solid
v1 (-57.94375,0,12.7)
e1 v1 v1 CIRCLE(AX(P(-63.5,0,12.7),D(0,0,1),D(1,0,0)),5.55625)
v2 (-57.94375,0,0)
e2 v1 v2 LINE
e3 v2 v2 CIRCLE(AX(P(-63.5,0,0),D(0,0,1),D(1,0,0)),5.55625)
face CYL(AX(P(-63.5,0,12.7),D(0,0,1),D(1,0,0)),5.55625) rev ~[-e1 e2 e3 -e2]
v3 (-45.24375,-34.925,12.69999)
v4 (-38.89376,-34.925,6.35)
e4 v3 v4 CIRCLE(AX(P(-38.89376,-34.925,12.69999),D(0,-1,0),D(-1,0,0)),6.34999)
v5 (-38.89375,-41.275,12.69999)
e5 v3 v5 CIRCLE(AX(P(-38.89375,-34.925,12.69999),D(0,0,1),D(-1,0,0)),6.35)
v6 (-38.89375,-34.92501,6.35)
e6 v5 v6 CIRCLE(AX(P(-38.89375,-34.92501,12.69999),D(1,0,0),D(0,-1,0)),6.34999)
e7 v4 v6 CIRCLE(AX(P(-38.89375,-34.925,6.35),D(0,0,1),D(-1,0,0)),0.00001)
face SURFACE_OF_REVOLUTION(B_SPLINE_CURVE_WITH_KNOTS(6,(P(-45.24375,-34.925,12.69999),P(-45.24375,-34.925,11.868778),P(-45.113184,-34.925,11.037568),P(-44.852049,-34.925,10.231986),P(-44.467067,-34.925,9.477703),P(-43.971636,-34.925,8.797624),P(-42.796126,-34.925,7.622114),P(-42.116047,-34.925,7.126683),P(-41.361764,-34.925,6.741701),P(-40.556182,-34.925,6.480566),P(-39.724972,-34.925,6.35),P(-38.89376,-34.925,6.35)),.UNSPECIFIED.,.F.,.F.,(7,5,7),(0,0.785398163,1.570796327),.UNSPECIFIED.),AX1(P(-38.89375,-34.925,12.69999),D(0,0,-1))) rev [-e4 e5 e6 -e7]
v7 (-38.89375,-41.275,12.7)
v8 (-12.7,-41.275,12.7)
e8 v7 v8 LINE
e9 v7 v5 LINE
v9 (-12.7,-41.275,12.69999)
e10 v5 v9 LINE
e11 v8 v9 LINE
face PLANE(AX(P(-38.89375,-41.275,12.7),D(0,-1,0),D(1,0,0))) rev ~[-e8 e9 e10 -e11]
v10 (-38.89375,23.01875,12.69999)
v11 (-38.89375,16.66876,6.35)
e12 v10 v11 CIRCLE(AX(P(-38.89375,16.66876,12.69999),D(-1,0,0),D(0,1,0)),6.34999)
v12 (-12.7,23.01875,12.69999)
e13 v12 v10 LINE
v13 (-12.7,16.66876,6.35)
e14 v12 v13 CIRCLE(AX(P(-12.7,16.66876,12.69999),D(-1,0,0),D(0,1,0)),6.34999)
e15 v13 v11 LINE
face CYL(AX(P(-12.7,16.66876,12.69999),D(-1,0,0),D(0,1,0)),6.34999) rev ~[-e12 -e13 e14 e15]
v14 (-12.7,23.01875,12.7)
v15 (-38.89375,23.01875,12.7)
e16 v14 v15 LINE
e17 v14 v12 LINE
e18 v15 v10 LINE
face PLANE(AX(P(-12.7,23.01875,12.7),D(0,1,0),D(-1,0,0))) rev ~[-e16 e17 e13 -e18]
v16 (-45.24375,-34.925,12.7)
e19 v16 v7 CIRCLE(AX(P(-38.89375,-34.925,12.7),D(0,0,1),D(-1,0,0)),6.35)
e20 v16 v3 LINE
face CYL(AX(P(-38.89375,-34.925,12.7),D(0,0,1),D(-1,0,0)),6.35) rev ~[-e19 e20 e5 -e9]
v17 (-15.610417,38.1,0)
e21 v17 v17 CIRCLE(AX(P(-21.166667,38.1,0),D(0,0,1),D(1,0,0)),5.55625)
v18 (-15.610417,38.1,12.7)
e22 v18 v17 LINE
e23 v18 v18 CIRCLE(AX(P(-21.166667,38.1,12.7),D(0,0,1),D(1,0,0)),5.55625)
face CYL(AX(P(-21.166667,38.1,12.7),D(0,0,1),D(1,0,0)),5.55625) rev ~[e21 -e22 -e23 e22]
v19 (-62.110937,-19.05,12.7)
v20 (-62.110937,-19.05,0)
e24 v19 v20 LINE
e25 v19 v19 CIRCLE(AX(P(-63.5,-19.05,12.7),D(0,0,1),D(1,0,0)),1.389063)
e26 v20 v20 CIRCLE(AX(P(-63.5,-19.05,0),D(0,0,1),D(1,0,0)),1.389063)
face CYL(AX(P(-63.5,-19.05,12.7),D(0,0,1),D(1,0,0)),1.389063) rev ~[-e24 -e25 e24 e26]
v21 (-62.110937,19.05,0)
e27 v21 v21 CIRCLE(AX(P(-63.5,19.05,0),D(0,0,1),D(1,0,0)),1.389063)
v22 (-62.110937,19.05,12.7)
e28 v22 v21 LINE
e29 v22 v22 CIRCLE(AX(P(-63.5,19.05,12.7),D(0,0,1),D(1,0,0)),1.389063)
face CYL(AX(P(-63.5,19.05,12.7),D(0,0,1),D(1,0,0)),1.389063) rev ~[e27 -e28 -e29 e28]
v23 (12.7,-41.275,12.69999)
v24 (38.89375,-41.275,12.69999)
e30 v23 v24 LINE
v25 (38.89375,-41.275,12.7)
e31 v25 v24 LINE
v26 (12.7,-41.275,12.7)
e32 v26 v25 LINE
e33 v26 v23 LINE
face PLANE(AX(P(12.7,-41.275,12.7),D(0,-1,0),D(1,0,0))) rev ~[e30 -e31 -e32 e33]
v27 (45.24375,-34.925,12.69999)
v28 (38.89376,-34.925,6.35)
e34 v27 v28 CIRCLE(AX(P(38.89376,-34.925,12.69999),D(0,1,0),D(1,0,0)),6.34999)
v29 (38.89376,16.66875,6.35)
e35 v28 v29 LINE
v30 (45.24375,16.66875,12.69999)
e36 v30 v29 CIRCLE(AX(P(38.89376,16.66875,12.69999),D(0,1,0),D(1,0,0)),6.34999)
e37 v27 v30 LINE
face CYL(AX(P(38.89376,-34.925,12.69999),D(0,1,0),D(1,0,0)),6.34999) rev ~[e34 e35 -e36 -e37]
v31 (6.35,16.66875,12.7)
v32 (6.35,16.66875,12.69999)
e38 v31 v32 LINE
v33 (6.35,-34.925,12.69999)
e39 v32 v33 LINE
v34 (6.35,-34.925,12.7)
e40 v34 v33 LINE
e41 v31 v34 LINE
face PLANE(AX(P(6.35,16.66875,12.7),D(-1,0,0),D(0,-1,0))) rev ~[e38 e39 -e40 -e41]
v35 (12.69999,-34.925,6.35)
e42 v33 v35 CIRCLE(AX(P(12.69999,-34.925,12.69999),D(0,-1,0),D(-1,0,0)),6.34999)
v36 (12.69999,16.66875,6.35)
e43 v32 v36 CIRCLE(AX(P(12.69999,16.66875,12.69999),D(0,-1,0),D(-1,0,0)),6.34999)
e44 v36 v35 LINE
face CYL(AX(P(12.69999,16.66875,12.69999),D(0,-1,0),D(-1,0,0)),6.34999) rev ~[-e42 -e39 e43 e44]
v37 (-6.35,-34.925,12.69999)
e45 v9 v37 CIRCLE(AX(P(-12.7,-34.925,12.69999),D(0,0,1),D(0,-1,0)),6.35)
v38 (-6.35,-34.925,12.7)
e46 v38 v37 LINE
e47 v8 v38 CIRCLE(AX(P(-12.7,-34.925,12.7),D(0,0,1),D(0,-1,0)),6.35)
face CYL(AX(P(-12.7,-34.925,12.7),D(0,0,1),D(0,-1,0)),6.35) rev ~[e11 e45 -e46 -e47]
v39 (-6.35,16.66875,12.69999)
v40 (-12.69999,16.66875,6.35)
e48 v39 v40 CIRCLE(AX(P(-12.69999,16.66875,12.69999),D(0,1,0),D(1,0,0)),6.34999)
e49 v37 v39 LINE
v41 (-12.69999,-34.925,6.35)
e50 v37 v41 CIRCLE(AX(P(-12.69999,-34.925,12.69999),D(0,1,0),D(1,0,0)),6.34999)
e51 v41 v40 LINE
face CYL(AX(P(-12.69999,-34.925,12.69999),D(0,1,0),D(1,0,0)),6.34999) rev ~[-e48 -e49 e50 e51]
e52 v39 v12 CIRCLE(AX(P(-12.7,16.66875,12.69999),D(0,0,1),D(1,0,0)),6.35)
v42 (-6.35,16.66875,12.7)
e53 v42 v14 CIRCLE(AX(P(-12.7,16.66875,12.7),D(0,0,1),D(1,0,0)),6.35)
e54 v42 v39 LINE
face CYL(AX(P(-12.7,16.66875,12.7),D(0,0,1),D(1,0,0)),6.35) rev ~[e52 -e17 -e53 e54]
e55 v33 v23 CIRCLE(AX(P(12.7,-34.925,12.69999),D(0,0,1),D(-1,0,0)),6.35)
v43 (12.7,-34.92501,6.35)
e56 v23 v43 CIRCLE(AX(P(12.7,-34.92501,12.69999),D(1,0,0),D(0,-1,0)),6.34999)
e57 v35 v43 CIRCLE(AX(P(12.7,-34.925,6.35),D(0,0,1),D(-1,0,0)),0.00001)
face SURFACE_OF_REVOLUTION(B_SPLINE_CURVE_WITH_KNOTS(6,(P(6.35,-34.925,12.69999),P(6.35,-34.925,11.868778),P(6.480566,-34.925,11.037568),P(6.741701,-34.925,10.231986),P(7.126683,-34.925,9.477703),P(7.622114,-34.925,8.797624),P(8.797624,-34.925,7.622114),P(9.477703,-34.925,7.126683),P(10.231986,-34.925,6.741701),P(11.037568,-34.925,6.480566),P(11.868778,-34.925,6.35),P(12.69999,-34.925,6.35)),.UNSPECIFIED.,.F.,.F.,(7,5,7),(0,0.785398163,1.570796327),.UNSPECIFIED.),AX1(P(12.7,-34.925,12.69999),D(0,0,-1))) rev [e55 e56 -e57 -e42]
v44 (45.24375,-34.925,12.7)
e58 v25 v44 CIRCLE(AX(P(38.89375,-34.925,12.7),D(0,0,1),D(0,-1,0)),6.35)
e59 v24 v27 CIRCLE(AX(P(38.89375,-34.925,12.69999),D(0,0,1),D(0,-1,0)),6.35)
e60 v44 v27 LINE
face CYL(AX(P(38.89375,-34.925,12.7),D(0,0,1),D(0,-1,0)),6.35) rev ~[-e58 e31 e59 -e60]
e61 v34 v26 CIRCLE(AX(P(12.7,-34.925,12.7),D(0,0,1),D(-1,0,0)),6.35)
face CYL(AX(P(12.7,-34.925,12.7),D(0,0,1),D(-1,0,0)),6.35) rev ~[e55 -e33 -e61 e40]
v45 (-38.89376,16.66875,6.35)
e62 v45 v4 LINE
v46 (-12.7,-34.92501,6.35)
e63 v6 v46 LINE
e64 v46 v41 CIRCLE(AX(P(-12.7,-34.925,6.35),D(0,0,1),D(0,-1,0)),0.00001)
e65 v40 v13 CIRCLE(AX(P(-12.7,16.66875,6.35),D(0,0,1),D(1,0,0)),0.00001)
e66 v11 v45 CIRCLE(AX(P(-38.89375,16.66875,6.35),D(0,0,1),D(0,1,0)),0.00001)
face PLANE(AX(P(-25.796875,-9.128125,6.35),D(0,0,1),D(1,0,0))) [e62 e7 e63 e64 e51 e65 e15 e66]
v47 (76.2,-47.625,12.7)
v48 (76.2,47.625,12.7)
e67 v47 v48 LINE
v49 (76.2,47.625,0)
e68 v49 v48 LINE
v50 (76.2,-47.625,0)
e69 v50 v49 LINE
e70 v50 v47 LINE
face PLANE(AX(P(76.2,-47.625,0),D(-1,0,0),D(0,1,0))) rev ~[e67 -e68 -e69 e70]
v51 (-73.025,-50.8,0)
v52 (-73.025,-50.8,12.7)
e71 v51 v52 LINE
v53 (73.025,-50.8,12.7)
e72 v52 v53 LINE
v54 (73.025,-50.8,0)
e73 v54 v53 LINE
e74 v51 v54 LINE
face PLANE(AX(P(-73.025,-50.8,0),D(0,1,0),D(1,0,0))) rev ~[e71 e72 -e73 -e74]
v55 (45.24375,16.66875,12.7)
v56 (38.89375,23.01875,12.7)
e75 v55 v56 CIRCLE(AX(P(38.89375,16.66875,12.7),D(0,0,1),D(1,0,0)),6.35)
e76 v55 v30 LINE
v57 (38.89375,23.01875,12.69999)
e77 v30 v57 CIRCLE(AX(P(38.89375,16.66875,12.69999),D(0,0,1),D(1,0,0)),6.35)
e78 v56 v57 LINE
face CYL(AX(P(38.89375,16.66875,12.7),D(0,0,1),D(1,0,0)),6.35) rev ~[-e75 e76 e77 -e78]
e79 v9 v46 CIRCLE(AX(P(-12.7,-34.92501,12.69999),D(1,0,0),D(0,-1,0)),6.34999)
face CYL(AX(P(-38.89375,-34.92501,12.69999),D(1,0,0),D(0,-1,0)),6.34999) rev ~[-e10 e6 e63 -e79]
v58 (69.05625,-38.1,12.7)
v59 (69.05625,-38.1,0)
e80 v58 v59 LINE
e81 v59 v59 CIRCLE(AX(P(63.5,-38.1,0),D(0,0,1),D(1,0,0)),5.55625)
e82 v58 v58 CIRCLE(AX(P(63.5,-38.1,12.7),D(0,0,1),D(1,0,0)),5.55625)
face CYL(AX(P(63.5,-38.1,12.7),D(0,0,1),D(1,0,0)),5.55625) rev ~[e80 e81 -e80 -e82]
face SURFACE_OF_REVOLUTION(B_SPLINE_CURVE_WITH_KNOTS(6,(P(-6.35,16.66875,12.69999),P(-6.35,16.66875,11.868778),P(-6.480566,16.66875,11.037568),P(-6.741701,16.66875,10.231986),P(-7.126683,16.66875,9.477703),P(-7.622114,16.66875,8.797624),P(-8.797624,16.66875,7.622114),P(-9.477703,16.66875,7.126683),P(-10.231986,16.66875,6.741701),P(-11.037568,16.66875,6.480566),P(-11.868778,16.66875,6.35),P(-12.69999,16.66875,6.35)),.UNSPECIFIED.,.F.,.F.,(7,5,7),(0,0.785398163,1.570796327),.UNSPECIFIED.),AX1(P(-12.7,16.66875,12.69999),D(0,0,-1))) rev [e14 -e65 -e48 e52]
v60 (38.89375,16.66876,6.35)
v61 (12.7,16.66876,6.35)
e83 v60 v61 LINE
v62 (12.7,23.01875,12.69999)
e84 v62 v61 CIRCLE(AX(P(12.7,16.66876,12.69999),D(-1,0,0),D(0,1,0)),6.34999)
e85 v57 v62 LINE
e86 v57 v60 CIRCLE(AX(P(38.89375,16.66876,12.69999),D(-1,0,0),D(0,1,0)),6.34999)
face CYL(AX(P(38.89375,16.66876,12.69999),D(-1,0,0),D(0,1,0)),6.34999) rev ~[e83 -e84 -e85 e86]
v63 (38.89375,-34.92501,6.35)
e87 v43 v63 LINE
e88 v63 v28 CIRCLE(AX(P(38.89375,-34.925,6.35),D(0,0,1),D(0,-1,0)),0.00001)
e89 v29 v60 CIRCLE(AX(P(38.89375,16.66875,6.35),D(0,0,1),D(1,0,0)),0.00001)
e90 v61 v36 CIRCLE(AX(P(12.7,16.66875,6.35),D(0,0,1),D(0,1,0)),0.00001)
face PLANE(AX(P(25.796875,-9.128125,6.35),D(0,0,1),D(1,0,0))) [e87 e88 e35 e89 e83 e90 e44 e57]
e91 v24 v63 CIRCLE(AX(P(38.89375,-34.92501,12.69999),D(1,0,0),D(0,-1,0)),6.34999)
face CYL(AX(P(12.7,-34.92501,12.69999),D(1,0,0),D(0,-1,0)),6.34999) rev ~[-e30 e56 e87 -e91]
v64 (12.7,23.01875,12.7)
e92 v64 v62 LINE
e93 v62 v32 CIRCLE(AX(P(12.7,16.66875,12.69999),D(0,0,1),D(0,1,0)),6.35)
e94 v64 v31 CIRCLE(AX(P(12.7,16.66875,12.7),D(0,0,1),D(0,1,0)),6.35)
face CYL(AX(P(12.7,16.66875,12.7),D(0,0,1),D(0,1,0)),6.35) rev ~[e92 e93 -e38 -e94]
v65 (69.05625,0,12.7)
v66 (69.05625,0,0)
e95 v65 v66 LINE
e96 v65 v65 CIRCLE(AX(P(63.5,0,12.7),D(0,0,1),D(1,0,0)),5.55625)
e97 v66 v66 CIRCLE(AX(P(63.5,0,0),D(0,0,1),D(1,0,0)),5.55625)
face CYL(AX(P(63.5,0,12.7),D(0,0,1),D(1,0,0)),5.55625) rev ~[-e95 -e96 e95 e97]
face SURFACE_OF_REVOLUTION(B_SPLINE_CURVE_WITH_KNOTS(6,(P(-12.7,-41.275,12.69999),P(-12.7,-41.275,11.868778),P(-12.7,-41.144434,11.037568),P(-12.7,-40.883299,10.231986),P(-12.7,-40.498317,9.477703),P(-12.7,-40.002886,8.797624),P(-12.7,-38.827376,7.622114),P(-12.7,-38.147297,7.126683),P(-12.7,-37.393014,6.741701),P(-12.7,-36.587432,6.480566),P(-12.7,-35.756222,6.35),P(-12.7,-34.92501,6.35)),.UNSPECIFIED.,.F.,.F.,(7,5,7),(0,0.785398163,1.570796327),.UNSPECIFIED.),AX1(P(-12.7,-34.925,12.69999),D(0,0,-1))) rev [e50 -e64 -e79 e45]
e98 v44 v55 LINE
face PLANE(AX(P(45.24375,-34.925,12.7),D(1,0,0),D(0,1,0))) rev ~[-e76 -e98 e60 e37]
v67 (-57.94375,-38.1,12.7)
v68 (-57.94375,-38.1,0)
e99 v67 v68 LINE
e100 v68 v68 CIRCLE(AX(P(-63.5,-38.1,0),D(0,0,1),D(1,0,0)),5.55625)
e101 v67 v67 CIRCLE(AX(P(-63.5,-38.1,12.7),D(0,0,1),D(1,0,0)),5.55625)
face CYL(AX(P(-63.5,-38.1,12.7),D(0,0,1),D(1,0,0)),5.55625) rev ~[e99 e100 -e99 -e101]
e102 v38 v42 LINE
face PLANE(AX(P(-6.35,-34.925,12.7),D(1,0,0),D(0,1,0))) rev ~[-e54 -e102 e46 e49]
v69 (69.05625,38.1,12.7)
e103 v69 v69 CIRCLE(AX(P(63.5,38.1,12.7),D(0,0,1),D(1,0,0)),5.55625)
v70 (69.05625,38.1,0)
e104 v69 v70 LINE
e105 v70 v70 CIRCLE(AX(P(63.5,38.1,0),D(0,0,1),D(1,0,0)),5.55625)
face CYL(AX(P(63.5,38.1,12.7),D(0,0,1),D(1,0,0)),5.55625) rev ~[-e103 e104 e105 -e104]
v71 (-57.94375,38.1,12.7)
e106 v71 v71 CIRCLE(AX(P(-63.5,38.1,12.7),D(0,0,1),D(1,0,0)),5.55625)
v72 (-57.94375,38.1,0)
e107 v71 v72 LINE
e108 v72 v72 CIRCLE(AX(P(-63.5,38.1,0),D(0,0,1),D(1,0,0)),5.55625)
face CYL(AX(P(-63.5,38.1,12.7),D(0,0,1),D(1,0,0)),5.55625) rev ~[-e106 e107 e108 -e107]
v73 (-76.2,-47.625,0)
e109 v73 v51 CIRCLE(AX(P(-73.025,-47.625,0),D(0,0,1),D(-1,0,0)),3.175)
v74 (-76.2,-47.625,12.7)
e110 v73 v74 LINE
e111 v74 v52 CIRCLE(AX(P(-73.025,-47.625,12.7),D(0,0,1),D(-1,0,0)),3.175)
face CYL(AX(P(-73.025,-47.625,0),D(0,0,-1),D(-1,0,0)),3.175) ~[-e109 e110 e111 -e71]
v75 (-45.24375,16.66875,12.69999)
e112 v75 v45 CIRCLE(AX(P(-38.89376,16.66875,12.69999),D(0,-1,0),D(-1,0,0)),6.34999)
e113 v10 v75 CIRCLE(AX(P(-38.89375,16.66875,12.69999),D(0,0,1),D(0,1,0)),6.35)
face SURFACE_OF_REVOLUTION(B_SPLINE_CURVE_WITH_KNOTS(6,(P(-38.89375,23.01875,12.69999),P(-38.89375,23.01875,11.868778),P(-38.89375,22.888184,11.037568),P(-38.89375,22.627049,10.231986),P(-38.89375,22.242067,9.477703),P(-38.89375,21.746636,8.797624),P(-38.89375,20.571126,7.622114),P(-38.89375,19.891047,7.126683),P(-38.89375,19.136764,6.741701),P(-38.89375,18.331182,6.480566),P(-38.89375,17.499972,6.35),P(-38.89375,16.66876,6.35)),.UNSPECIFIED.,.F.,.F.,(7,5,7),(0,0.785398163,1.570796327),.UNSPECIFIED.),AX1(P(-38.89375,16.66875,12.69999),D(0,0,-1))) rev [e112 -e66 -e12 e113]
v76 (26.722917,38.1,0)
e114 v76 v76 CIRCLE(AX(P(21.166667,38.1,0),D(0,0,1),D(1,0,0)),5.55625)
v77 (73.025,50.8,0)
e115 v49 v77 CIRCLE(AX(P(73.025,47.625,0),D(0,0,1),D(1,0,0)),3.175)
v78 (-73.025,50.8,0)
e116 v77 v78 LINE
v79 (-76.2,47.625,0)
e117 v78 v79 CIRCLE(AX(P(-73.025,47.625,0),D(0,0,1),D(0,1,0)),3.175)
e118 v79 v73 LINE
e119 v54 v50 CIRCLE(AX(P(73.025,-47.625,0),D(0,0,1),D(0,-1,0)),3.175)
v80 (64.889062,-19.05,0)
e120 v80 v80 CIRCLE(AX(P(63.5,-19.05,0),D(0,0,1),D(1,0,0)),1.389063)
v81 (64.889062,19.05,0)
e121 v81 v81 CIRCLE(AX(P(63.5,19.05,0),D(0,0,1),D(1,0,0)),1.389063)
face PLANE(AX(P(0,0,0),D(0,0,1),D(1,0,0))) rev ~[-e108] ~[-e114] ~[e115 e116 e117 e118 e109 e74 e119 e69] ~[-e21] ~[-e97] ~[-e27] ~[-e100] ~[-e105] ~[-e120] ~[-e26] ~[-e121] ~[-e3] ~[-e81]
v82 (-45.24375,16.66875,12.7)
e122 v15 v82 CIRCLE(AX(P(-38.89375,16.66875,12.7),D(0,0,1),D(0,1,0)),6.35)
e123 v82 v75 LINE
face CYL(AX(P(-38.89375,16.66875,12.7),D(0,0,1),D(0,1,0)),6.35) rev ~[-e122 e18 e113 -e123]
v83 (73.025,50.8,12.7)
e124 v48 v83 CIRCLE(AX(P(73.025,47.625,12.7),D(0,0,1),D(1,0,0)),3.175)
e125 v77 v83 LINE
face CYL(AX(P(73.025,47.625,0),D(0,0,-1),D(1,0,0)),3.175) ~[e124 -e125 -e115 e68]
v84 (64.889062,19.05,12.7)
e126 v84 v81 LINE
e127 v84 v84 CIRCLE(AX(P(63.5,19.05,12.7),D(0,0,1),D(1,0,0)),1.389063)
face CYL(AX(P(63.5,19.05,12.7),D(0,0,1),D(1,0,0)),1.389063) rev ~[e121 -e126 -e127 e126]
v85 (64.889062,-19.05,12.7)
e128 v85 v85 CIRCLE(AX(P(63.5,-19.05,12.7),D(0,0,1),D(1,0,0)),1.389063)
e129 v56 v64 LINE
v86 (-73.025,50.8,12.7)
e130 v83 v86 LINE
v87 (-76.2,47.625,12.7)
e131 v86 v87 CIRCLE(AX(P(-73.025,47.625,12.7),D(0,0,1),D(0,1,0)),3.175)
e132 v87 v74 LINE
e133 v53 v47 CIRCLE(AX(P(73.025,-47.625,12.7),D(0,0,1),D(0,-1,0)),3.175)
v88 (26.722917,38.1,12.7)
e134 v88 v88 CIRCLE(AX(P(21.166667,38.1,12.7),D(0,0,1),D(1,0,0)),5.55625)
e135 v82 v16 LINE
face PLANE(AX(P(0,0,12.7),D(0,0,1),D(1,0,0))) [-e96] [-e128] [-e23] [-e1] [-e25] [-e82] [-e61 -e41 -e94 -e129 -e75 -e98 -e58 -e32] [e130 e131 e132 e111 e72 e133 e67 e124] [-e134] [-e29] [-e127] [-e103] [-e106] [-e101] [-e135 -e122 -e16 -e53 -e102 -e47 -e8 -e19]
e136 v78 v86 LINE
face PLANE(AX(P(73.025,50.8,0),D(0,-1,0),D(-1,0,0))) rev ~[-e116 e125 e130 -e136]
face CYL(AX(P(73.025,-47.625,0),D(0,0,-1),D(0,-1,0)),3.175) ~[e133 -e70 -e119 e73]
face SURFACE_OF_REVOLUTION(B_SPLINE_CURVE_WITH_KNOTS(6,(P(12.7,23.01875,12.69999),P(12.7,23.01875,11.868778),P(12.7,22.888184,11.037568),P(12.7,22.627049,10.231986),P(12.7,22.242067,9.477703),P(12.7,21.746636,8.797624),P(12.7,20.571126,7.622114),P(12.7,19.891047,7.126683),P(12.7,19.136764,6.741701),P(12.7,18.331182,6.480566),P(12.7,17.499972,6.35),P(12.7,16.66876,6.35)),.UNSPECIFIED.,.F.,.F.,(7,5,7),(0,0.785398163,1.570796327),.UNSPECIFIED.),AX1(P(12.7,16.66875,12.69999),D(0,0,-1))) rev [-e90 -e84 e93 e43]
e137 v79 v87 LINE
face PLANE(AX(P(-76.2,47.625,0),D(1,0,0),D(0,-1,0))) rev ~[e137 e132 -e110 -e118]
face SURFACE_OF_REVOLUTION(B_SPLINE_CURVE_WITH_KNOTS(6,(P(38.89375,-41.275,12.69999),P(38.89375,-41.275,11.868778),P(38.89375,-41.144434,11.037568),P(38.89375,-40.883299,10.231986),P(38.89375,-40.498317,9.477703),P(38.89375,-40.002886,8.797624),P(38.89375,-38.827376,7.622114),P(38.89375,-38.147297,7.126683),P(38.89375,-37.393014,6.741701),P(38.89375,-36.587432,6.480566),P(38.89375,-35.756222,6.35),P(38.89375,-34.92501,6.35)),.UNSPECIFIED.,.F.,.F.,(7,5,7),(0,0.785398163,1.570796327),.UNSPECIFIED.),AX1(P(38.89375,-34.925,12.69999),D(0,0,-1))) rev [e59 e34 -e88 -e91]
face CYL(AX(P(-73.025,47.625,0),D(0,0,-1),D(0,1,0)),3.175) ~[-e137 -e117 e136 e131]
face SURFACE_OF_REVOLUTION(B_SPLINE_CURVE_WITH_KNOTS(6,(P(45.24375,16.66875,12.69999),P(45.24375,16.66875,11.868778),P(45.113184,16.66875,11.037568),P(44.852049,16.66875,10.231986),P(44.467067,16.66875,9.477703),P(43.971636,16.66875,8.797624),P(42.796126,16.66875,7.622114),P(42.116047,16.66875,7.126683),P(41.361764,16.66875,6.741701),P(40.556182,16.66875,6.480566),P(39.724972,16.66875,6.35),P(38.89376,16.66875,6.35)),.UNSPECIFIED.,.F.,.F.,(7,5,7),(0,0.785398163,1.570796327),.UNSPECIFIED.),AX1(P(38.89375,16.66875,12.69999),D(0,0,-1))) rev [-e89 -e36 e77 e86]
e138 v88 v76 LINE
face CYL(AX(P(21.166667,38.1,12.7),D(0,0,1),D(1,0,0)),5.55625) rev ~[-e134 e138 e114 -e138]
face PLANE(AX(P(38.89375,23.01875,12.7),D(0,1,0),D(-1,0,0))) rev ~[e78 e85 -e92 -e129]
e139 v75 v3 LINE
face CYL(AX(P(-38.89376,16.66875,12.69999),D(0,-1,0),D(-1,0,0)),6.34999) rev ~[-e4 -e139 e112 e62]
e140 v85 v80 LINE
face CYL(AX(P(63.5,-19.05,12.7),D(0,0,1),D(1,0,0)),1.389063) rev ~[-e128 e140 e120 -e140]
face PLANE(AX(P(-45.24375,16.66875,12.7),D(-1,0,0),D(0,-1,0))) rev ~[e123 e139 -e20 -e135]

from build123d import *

# Parameters (mm, degrees)
F1_DEPTH = 12.7
F3_R     = 5.55625
F4_DEPTH = 12.701
F2_R     = 1.3890625
F5_DEPTH = 12.701
F7_DEPTH = 6.35
F8_R     = 6.34999
F9_R     = 6.34999


# Not quite as in the source:
# - a fillet or chamfer is up to 0.001 mm smaller than in the source, because OpenCascade refuses the exact size


with BuildPart() as f1:
    # F0 (on Top) → F1 (new body)
    with BuildSketch(Plane.XY):
        with BuildLine():
            Line((-73.025, -50.8), (73.025, -50.8))
            ThreePointArc((73.025, -50.8), (75.2700640303, -49.8700640303), (76.2, -47.625))
            Line((76.2, -47.625), (76.2, 47.625))
            ThreePointArc((76.2, 47.625), (75.2700640303, 49.8700640303), (73.025, 50.8))
            Line((73.025, 50.8), (-73.025, 50.8))
            ThreePointArc((-73.025, 50.8), (-75.2700640303, 49.8700640303), (-76.2, 47.625))
            Line((-76.2, 47.625), (-76.2, -47.625))
            ThreePointArc((-76.2, -47.625), (-75.2700640303, -49.8700640303), (-73.025, -50.8))
        make_face()
    extrude(amount=F1_DEPTH)

    # F3 (on face) → F4 (cut, through all)
    with BuildSketch(Plane.XY.offset(12.7)):
        with Locations((-63.5, 38.1)):
            Circle(F3_R)
        with Locations((63.5, 38.1)):
            Circle(F3_R)
        with Locations((63.5, -38.1)):
            Circle(F3_R)
        with Locations((-63.5, -38.1)):
            Circle(F3_R)
        with Locations((-63.5, 0)):
            Circle(F3_R)
        with Locations((63.5, 0)):
            Circle(F3_R)
        with Locations((-21.1666666667, 38.1)):
            Circle(F3_R)
        with Locations((21.1666666667, 38.1)):
            Circle(F3_R)
    extrude(amount=-F4_DEPTH, mode=Mode.SUBTRACT)

    # F2 (on face) → F5 (cut, through all)
    with BuildSketch(Plane.XY.offset(12.7)):
        with Locations((-63.5, -19.05)):
            Circle(F2_R)
        with Locations((63.5, 19.05)):
            Circle(F2_R)
        with Locations((63.5, -19.05)):
            Circle(F2_R)
        with Locations((-63.5, 19.05)):
            Circle(F2_R)
    extrude(amount=-F5_DEPTH, mode=Mode.SUBTRACT)

    # F6 (on face) → F7 (cut)
    with BuildSketch(Plane.XY.offset(12.7)):
        with BuildLine():
            ThreePointArc((-6.35, 16.66875), (-8.2098719395, 21.1588780605), (-12.7, 23.01875))
            Line((-12.7, 23.01875), (-38.89375, 23.01875))
            ThreePointArc((-38.89375, 23.01875), (-43.3838780605, 21.1588780605), (-45.24375, 16.66875))
            Line((-45.24375, 16.66875), (-45.24375, -34.925))
            ThreePointArc((-45.24375, -34.925), (-43.3838780605, -39.4151280605), (-38.89375, -41.275))
            Line((-38.89375, -41.275), (-12.7, -41.275))
            ThreePointArc((-12.7, -41.275), (-8.2098719395, -39.4151280605), (-6.35, -34.925))
            Line((-6.35, -34.925), (-6.35, 16.66875))
        make_face()
        with BuildLine():
            ThreePointArc((6.35, -34.925), (8.2098719395, -39.4151280605), (12.7, -41.275))
            Line((12.7, -41.275), (38.89375, -41.275))
            ThreePointArc((38.89375, -41.275), (43.3838780605, -39.4151280605), (45.24375, -34.925))
            Line((45.24375, -34.925), (45.24375, 16.66875))
            ThreePointArc((45.24375, 16.66875), (43.3838780605, 21.1588780605), (38.89375, 23.01875))
            Line((38.89375, 23.01875), (12.7, 23.01875))
            ThreePointArc((12.7, 23.01875), (8.2098719395, 21.1588780605), (6.35, 16.66875))
            Line((6.35, 16.66875), (6.35, -34.925))
        make_face()
    extrude(amount=-F7_DEPTH, mode=Mode.SUBTRACT)

    # F8 (radius 6.35 in the source; OpenCascade refuses exactly that, so slightly less here)
    f8_edges = [f1.edges().sort_by_distance(p)[0] for p in [
        (-25.796875, -41.275, 6.35),
        (-6.35, -9.128125, 6.35),
        (-8.209872, -39.415128, 6.35),
        (-45.24375, -9.128125, 6.35),
        (-43.383878, -39.415128, 6.35),
        (-43.383878, 21.158878, 6.35),
        (-25.796875, 23.01875, 6.35),
        (-8.209872, 21.158878, 6.35),
    ]]
    fillet(f8_edges, radius=F8_R)

    # F9 (radius 6.35 in the source; OpenCascade refuses exactly that, so slightly less here)
    f9_edges = [f1.edges().sort_by_distance(p)[0] for p in [
        (6.35, -9.128125, 6.35),
        (8.209872, 21.158878, 6.35),
        (25.796875, 23.01875, 6.35),
        (43.383878, 21.158878, 6.35),
        (45.24375, -9.128125, 6.35),
        (43.383878, -39.415128, 6.35),
        (25.796875, -41.275, 6.35),
        (8.209872, -39.415128, 6.35),
    ]]
    fillet(f9_edges, radius=F9_R)


solid = f1.part
